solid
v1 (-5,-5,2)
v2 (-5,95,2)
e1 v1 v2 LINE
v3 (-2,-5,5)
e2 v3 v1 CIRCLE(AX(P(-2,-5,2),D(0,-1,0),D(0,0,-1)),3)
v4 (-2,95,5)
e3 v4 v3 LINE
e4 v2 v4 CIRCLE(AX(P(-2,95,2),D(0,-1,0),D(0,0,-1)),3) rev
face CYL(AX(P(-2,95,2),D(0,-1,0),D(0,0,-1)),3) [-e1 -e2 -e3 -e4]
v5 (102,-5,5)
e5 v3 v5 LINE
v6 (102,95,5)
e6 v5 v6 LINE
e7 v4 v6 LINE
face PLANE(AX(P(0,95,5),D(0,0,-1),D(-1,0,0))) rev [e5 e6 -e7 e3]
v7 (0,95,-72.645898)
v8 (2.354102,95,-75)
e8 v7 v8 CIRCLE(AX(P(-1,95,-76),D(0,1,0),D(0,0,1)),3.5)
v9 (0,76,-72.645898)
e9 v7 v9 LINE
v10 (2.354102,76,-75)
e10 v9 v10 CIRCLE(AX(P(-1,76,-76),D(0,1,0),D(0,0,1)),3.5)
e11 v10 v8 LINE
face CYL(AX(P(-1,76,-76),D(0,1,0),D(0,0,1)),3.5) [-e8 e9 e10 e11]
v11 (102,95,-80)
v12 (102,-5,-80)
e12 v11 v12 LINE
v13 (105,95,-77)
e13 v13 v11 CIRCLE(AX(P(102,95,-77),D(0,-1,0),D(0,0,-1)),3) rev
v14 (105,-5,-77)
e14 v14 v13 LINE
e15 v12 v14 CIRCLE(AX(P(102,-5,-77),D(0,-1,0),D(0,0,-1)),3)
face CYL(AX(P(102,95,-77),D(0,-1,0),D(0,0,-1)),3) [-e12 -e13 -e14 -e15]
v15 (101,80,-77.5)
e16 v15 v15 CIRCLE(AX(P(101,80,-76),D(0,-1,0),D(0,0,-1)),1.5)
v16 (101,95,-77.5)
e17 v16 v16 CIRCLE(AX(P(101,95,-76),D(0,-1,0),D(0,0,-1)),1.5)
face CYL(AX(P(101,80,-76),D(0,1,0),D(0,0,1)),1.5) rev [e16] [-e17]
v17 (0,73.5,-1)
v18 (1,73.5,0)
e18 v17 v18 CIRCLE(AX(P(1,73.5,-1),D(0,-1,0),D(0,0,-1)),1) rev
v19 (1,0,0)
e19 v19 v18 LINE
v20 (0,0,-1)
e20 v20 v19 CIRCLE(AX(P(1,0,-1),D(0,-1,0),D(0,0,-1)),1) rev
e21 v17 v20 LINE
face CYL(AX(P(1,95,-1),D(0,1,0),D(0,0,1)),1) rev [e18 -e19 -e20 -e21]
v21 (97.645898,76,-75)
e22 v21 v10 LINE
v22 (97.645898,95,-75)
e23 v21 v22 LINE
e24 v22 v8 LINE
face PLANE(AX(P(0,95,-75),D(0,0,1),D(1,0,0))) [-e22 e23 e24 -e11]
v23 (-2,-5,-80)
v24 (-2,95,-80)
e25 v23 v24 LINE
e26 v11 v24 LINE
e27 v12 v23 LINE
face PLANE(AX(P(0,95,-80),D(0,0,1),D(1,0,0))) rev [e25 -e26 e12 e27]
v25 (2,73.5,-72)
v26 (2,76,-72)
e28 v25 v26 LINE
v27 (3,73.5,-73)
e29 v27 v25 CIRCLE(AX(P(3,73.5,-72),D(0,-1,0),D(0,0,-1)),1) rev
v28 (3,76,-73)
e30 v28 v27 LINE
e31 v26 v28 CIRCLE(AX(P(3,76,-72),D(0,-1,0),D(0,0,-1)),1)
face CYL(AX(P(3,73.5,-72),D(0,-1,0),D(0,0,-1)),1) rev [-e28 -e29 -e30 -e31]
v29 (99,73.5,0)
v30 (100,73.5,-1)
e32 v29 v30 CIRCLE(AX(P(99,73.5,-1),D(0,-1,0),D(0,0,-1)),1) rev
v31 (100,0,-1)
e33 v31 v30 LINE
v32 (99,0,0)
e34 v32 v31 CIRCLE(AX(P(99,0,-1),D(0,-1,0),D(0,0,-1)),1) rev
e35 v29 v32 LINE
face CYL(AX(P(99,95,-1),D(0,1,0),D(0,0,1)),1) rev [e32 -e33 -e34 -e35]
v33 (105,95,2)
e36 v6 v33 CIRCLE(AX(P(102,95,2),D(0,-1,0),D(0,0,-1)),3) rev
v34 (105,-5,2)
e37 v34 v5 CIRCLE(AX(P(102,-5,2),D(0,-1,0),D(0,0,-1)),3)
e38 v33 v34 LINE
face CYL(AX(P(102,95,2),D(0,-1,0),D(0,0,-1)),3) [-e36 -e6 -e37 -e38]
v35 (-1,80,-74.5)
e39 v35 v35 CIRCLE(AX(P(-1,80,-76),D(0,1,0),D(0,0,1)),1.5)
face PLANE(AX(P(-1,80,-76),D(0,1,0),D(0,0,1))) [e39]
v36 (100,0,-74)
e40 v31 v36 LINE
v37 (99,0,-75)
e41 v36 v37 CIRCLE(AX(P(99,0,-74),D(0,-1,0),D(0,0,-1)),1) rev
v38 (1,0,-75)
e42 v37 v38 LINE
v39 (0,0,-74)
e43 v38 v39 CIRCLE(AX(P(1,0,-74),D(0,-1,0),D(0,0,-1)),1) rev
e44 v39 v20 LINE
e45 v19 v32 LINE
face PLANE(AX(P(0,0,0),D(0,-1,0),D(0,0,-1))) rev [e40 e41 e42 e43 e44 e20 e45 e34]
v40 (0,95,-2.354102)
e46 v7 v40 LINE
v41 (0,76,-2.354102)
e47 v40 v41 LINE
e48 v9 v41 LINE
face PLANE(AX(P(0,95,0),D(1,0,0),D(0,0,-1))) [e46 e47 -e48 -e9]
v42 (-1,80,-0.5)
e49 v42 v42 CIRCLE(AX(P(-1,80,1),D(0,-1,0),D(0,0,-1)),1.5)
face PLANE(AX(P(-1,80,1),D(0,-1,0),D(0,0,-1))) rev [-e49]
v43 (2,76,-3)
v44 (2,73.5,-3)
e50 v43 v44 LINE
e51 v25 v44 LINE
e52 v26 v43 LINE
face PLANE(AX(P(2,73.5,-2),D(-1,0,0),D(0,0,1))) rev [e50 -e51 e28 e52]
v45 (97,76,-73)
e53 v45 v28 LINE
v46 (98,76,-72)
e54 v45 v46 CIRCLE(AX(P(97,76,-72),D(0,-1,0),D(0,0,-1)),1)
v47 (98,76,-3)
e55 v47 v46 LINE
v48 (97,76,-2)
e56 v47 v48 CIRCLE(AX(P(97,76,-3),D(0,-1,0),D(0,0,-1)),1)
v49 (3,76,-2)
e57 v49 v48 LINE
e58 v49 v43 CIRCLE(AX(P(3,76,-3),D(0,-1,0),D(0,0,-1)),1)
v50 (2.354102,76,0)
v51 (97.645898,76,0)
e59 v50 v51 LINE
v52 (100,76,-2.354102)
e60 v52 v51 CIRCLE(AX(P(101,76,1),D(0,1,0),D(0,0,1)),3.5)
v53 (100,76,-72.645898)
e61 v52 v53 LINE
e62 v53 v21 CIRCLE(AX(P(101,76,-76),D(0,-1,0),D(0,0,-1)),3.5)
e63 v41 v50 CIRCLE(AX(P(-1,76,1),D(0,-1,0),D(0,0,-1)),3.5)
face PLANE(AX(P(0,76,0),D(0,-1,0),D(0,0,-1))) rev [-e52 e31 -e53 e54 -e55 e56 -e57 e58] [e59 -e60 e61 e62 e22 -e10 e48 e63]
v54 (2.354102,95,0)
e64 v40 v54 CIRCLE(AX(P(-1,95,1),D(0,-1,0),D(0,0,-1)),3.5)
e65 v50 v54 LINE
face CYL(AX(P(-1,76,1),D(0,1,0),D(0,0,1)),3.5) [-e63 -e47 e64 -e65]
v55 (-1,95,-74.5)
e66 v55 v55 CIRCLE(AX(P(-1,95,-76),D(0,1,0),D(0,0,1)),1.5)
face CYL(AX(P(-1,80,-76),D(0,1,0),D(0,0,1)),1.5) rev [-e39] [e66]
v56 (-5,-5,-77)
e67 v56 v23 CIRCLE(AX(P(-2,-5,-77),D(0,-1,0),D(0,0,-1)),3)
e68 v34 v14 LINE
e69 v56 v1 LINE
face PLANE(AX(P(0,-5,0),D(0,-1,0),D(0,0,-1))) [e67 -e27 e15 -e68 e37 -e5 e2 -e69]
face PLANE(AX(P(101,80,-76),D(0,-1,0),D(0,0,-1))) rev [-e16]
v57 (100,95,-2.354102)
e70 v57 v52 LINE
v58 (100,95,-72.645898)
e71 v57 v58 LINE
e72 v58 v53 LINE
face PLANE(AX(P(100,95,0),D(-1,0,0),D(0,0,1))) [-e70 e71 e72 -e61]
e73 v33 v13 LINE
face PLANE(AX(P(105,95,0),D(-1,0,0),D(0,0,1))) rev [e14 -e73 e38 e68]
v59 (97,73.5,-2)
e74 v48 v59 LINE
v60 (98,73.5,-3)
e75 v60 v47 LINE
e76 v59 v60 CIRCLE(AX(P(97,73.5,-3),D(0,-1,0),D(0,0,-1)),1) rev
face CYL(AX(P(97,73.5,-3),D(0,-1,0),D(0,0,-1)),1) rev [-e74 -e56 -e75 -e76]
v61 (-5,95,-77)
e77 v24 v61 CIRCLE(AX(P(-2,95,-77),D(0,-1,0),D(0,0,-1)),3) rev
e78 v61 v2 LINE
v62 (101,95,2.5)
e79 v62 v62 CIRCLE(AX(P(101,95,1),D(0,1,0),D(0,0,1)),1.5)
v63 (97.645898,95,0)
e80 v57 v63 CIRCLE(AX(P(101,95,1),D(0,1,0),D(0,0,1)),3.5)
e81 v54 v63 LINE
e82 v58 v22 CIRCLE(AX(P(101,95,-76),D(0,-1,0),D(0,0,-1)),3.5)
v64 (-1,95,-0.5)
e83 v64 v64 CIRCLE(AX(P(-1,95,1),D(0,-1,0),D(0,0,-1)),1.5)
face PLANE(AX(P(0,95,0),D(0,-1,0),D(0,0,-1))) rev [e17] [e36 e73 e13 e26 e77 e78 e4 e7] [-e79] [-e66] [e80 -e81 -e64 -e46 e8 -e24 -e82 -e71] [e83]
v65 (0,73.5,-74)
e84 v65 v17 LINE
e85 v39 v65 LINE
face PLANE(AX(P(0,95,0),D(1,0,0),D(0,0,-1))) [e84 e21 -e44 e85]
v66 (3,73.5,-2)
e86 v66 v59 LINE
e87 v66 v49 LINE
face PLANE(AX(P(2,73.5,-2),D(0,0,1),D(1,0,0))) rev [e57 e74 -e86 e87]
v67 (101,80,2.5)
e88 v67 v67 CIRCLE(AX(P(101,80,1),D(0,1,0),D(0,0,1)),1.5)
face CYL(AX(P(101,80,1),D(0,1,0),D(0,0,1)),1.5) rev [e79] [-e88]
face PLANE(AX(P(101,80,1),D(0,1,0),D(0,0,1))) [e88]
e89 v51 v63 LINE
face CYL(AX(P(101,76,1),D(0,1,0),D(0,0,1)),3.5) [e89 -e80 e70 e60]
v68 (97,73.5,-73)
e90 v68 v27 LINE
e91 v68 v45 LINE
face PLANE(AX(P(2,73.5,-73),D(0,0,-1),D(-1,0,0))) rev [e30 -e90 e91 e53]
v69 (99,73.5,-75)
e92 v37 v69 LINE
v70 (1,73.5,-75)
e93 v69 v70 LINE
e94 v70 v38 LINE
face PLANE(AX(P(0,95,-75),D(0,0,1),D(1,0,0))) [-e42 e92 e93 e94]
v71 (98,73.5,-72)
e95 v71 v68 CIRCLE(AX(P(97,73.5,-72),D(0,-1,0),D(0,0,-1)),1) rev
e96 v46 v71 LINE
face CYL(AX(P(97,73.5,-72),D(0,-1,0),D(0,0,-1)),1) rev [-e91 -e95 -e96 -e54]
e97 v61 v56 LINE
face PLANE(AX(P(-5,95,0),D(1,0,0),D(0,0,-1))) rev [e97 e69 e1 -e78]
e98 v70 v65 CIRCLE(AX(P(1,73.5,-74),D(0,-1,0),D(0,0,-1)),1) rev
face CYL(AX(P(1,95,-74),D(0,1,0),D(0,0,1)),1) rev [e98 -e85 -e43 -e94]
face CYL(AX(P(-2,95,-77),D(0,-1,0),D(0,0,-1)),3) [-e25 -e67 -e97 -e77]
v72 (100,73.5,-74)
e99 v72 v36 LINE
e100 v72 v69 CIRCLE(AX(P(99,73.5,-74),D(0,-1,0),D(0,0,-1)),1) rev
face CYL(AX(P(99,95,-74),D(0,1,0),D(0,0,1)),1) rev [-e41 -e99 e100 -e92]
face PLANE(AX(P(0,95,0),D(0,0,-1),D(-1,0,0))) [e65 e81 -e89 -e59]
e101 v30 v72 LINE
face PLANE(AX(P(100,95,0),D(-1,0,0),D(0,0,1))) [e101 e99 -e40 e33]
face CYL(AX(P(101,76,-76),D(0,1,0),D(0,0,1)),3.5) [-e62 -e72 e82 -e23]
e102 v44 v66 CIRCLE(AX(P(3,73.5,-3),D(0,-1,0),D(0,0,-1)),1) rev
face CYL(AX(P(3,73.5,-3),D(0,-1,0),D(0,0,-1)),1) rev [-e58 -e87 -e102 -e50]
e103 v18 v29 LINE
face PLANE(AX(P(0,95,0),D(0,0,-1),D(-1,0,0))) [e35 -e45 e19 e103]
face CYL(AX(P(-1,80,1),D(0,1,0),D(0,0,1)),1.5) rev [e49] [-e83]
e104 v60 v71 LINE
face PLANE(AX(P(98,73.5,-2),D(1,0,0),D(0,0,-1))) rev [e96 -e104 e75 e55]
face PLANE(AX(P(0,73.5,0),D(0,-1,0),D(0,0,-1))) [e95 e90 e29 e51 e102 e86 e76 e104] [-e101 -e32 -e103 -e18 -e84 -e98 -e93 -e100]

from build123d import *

# Parameters (mm, degrees)
SKETCH1_W                = 100
SKETCH1_H                = 75
BOSS_EXTRUDE1_DEPTH      = 95
SHELL1_T                 = 5
FILLET2_R                = 3
SKETCH6_R                = 3.5
BOSS_EXTRUDE4_DEPTH      = 19
SKETCH6_4_R              = 1.5
CUT_EXTRUDE2_DEPTH       = 15
FILLET3_R                = 1
BOSS_EXTRUDE5_DEPTH      = 1
BOSS_EXTRUDE5_DEPTH_BACK = 1.5
SKETCH8_W                = 100
SKETCH8_H                = 75
SKETCH8_W_2              = 96
SKETCH8_H_2              = 71
FILLET4_R                = 1


with BuildPart() as part:
    # Sketch1 → Boss-Extrude1 (new body)
    with BuildSketch(Plane(origin=(0, 0, 0), x_dir=(1, 0, 0), z_dir=(0, 1, 0))):
        with Locations((50, 37.5)):
            Rectangle(SKETCH1_W, SKETCH1_H)
    extrude(amount=BOSS_EXTRUDE1_DEPTH)

    # Shell1
    shell1_openings = [part.faces().sort_by_distance(p)[0] for p in [
        (50, 95, -37.5),
    ]]
    offset(amount=SHELL1_T, openings=shell1_openings, kind=Kind.INTERSECTION)

    # Fillet2
    # the kernel refuses this fillet: 3 mm, written as the material it takes off along each edge
    with BuildSketch(Plane(origin=(-5, -12.5, -80), x_dir=(1, 0, 0), z_dir=(0, 1, 0)), Plane(origin=(105, -12.5, -80), x_dir=(0, 0, 1), z_dir=(0, 1, 0)), Plane(origin=(105, -12.5, 5), x_dir=(-1, 0, 0), z_dir=(0, 1, 0)), Plane(origin=(-5, 102.5, 5), x_dir=(1, 0, 0), z_dir=(0, -1, 0))) as fillet2_piece_1:
        with BuildLine():
            CenterArc((FILLET2_R, -FILLET2_R), FILLET2_R, 90, 90)
            Line((0, -FILLET2_R), (0, 0))
            Line((0, 0), (FILLET2_R, 0))
        make_face()
    extrude(amount=115, mode=Mode.SUBTRACT)

    # Sketch6 → Boss-Extrude4 (add)
    with BuildSketch(Plane(origin=(0, 95, 0), x_dir=(1, 0, 0), z_dir=(0, 1, 0))):
        with Locations((-1, 76)):
            Circle(SKETCH6_R)
        with Locations((101, 76)):
            Circle(SKETCH6_R)
        with Locations((101, -1)):
            Circle(SKETCH6_R)
        with Locations((-1, -1)):
            Circle(SKETCH6_R)
    extrude(amount=-BOSS_EXTRUDE4_DEPTH)

    # Sketch6<4> → Cut-Extrude2 (cut)
    with BuildSketch(Plane(origin=(0, 95, 0), x_dir=(1, 0, 0), z_dir=(0, 1, 0))):
        with Locations(Location((-1, 76, 0), (0, 0, 270))):
            Circle(SKETCH6_4_R)
        with Locations(Location((101, 76, 0), (0, 0, 90))):
            Circle(SKETCH6_4_R)
        with Locations(Location((101, -1, 0), (0, 0, 270))):
            Circle(SKETCH6_4_R)
        with Locations(Location((-1, -1, 0), (0, 0, 90))):
            Circle(SKETCH6_4_R)
    extrude(amount=-CUT_EXTRUDE2_DEPTH, mode=Mode.SUBTRACT)

    # Fillet3
    fillet3_edges = [part.edges().sort_by_distance(p)[0] for p in [
        (0, 38, 0),
        (0, 38, -75),
        (100, 38, -75),
        (100, 38, 0),
    ]]
    fillet(fillet3_edges, radius=FILLET3_R)

    # Sketch8 → Boss-Extrude5 (add, two sides: drawn at the far end of the back side and taken through both)
    with BuildSketch(Plane(origin=(0, 75, 0), x_dir=(1, 0, 0), z_dir=(0, 1, 0)).offset(-BOSS_EXTRUDE5_DEPTH_BACK)):
        with Locations((50, 37.5)):
            Rectangle(SKETCH8_W, SKETCH8_H)
        with Locations((50, 37.5)):
            Rectangle(SKETCH8_W_2, SKETCH8_H_2, mode=Mode.SUBTRACT)
    extrude(amount=BOSS_EXTRUDE5_DEPTH + BOSS_EXTRUDE5_DEPTH_BACK)

    # Fillet4
    fillet4_edges = [part.edges().sort_by_distance(p)[0] for p in [
        (2, 74.75, -73),
        (98, 74.75, -73),
        (98, 74.75, -2),
        (2, 74.75, -2),
    ]]
    fillet(fillet4_edges, radius=FILLET4_R)


solid = part.part
